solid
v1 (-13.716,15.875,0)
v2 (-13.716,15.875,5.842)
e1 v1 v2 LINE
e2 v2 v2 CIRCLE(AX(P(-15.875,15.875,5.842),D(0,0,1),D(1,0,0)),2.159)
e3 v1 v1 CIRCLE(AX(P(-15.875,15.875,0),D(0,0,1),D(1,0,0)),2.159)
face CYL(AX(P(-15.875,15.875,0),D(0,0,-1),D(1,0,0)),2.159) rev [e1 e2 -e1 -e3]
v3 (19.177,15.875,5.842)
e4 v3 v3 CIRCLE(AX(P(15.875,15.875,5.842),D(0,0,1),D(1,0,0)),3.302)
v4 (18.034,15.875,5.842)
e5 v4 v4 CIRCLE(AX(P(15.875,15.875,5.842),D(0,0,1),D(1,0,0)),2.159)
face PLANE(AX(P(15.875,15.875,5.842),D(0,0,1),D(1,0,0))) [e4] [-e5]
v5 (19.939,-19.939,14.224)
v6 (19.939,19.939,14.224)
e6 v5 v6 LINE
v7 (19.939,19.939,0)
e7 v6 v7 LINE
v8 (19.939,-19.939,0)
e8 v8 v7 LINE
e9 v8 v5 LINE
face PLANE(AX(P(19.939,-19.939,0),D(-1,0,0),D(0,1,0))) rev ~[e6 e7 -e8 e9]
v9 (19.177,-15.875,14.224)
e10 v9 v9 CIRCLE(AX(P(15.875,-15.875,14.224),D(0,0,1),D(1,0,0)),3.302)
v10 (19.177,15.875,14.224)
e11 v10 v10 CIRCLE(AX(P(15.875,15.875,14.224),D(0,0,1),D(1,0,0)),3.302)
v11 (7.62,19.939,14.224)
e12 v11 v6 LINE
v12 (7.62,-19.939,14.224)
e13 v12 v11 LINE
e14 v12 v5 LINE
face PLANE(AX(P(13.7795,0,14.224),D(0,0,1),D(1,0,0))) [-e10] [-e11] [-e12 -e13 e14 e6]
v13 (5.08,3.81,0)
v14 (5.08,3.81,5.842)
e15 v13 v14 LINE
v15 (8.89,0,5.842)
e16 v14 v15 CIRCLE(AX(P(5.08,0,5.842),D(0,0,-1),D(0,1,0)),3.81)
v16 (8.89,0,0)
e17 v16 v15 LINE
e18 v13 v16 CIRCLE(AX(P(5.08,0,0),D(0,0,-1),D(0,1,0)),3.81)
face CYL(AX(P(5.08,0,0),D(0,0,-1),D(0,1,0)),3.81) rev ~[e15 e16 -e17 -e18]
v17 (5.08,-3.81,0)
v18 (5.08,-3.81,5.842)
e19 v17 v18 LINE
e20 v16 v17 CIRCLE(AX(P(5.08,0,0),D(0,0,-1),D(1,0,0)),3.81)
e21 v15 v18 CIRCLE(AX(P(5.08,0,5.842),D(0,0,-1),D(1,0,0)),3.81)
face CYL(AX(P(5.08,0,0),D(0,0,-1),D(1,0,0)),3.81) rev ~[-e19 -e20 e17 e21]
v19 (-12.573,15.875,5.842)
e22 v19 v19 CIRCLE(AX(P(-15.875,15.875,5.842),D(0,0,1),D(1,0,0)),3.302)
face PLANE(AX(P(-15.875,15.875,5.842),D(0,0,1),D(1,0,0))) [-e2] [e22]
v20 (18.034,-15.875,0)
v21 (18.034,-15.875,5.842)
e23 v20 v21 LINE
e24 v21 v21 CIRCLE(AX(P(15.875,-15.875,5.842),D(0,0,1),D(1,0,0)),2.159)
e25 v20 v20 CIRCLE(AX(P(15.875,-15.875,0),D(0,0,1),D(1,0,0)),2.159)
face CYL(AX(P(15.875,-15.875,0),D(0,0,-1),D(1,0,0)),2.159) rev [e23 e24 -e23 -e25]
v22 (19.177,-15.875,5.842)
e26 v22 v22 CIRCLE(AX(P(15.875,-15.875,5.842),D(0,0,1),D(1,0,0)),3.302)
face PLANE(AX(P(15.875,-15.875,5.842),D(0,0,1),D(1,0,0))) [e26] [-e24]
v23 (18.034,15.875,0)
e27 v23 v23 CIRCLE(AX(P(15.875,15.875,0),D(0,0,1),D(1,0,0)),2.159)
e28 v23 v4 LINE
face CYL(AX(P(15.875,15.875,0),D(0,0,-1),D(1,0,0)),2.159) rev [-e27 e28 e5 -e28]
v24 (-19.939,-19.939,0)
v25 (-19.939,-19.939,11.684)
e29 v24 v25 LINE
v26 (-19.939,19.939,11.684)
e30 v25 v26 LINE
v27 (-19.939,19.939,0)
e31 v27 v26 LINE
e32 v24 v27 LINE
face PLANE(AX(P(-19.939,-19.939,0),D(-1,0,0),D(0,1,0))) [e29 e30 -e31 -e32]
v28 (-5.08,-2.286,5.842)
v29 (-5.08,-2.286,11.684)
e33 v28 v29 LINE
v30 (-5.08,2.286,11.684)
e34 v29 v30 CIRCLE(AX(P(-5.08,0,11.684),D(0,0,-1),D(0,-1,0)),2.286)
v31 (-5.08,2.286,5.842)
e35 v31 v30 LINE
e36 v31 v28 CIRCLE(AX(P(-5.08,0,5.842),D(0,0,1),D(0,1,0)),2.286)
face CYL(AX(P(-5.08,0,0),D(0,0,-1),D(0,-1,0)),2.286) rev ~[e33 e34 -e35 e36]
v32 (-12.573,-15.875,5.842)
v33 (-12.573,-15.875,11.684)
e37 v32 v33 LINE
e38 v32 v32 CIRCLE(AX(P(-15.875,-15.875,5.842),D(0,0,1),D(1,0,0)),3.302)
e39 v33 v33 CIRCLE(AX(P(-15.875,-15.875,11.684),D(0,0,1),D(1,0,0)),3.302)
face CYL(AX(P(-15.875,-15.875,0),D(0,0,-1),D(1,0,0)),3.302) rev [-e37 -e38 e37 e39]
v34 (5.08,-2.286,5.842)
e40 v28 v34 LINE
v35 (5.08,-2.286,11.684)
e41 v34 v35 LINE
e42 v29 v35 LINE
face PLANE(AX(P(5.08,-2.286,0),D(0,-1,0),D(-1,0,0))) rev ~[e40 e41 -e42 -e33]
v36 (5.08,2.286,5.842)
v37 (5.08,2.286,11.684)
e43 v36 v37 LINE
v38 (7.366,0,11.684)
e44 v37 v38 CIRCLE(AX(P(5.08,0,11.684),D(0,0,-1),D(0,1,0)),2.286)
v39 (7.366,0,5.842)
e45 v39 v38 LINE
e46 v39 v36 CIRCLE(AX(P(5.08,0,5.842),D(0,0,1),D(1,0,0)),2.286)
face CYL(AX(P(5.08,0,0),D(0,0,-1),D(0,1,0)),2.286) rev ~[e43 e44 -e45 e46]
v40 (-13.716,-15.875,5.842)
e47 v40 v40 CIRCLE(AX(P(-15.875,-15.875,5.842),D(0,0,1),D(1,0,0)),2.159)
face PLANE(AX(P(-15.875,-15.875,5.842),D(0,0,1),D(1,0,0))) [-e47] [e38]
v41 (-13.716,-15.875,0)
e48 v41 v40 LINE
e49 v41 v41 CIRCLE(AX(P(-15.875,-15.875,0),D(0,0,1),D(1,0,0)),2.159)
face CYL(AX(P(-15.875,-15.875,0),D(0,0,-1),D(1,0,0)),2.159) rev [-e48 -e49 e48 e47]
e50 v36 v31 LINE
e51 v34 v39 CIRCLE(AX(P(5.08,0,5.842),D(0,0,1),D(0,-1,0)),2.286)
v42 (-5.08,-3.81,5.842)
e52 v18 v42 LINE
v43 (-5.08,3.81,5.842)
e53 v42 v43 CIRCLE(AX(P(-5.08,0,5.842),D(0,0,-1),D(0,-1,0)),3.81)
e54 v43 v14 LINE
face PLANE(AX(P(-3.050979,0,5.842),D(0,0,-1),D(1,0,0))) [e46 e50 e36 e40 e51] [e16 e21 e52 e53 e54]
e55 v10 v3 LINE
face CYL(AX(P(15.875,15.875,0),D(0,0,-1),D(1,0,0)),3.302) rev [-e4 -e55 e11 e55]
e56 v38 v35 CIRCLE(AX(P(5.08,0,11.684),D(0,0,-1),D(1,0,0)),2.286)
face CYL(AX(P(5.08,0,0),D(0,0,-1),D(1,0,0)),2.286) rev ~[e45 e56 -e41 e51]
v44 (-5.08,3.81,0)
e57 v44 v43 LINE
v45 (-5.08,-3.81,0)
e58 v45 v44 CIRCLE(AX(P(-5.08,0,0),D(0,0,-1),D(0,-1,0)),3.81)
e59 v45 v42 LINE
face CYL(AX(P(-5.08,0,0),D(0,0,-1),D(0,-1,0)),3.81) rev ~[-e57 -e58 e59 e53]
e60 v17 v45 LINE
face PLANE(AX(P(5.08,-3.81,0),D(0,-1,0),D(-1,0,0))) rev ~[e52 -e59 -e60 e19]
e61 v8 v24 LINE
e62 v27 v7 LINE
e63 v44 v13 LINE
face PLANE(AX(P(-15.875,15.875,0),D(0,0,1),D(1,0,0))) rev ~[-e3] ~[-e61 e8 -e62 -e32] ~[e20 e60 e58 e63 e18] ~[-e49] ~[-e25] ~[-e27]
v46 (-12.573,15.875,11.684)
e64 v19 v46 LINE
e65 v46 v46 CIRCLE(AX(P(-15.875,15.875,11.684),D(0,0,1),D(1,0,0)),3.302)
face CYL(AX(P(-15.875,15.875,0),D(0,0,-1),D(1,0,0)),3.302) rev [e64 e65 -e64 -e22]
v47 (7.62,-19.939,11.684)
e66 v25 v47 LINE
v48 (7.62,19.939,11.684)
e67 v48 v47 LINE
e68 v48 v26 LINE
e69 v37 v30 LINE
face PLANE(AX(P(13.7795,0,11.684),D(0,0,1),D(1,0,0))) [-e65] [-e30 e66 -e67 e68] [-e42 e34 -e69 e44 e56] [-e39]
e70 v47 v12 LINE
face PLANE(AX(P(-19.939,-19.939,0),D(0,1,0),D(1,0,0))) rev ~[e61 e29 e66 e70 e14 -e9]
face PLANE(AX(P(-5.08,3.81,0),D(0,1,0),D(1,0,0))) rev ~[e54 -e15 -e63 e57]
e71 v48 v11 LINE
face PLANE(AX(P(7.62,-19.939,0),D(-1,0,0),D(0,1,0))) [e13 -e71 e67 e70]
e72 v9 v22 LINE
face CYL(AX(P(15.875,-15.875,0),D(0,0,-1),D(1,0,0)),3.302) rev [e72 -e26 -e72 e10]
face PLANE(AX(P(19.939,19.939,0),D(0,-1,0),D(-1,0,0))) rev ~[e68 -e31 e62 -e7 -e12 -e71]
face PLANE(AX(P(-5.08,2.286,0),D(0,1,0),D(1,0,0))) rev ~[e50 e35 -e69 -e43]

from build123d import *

# Parameters (mm, degrees)
F0_W     = 12.319
F0_H     = 39.878
F0_R     = 3.302
F0_W_2   = 27.559
F1_DEPTH = 11.684
F0_R_2   = 2.159
F2_DEPTH = 5.842
F3_DEPTH = 14.224
F5_DEPTH = 25.4
F6_DEPTH = 5.842


# Not quite as in the source:
# - a feature names something its author has since deleted; it is built from what else it names


with BuildPart() as f1:
    # F0 (on Top) → F1 (new body)
    with BuildSketch(Plane.XY):
        with Locations((13.7795, 0)):
            Rectangle(F0_W, F0_H)
        with Locations((15.875, -15.875)):
            Circle(F0_R, mode=Mode.SUBTRACT)
        with Locations((15.875, 15.875)):
            Circle(F0_R, mode=Mode.SUBTRACT)
        with Locations((-6.1595, 0)):
            Rectangle(F0_W_2, F0_H)
        with Locations((-15.875, -15.875)):
            Circle(F0_R, mode=Mode.SUBTRACT)
        with Locations((-15.875, 15.875)):
            Circle(F0_R, mode=Mode.SUBTRACT)
    extrude(amount=F1_DEPTH)

    # F0 (on Top) → F2 (join)
    with BuildSketch(Plane.XY):
        with Locations((-15.875, 15.875)):
            Circle(F0_R)
        with Locations((-15.875, 15.875)):
            Circle(F0_R_2, mode=Mode.SUBTRACT)
        with Locations((15.875, 15.875)):
            Circle(F0_R)
        with Locations((15.875, 15.875)):
            Circle(F0_R_2, mode=Mode.SUBTRACT)
        with Locations((15.875, -15.875)):
            Circle(F0_R)
        with Locations((15.875, -15.875)):
            Circle(F0_R_2, mode=Mode.SUBTRACT)
        with Locations((-15.875, -15.875)):
            Circle(F0_R)
        with Locations((-15.875, -15.875)):
            Circle(F0_R_2, mode=Mode.SUBTRACT)
    extrude(amount=F2_DEPTH)

    # F0 (on Top) → F3 (join)
    with BuildSketch(Plane.XY):
        with Locations((13.7795, 0)):
            Rectangle(F0_W, F0_H)
        with Locations((15.875, -15.875)):
            Circle(F0_R, mode=Mode.SUBTRACT)
        with Locations((15.875, 15.875)):
            Circle(F0_R, mode=Mode.SUBTRACT)
    extrude(amount=F3_DEPTH)

    # F4 (on face) → F5 (cut)
    with BuildSketch(Plane(origin=(0, 0, 0), x_dir=(1, 0, 0), z_dir=(0, 0, -1))):
        with BuildLine():
            ThreePointArc((-2.794, 0), (-3.4635538982, 1.6164461018), (-5.08, 2.286))
            ThreePointArc((-5.08, 2.286), (-7.366, 0), (-5.08, -2.286))
            ThreePointArc((-5.08, -2.286), (-3.4635538982, -1.6164461018), (-2.794, 0))
        make_face()
        with BuildLine():
            ThreePointArc((7.366, 0), (6.6964461018, 1.6164461018), (5.08, 2.286))
            ThreePointArc((5.08, 2.286), (2.794, 0), (5.08, -2.286))
            ThreePointArc((5.08, -2.286), (6.6964461018, -1.6164461018), (7.366, 0))
        make_face()
        with BuildLine():
            ThreePointArc((-1.27, 0), (-1.4655166344, 1.2048277885), (-2.032, 2.286))
            Line((-2.032, 2.286), (-5.08, 2.286))
            ThreePointArc((-5.08, 2.286), (-3.4635538982, 1.6164461018), (-2.794, 0))
            ThreePointArc((-2.794, 0), (-3.4635538982, -1.6164461018), (-5.08, -2.286))
            Line((-5.08, -2.286), (-2.032, -2.286))
            ThreePointArc((-2.032, -2.286), (-1.4655166344, -1.2048277885), (-1.27, 0))
        make_face()
        with BuildLine():
            ThreePointArc((2.032, -2.286), (1.27, 0), (2.032, 2.286))
            Line((2.032, 2.286), (-2.032, 2.286))
            ThreePointArc((-2.032, 2.286), (-1.4655166344, 1.2048277885), (-1.27, 0))
            ThreePointArc((-1.27, 0), (-1.4655166344, -1.2048277885), (-2.032, -2.286))
            Line((-2.032, -2.286), (2.032, -2.286))
        make_face()
        with BuildLine():
            Line((5.08, 2.286), (2.032, 2.286))
            ThreePointArc((2.032, 2.286), (1.27, 0), (2.032, -2.286))
            Line((2.032, -2.286), (5.08, -2.286))
            ThreePointArc((5.08, -2.286), (2.794, 0), (5.08, 2.286))
        make_face()
    extrude(amount=-F5_DEPTH, mode=Mode.SUBTRACT)

    # F4 (on face) → F6 (cut)
    with BuildSketch(Plane(origin=(0, 0, 0), x_dir=(1, 0, 0), z_dir=(0, 0, -1))):
        with BuildLine():
            ThreePointArc((-1.27, 0), (-1.4655166344, 1.2048277885), (-2.032, 2.286))
            Line((-2.032, 2.286), (-5.08, 2.286))
            ThreePointArc((-5.08, 2.286), (-3.4635538982, 1.6164461018), (-2.794, 0))
            ThreePointArc((-2.794, 0), (-3.4635538982, -1.6164461018), (-5.08, -2.286))
            Line((-5.08, -2.286), (-2.032, -2.286))
            ThreePointArc((-2.032, -2.286), (-1.4655166344, -1.2048277885), (-1.27, 0))
        make_face()
        with BuildLine():
            ThreePointArc((-2.032, 2.286), (-3.3761162011, 3.4077675977), (-5.08, 3.81))
            ThreePointArc((-5.08, 3.81), (-8.89, 0), (-5.08, -3.81))
            ThreePointArc((-5.08, -3.81), (-3.3761162011, -3.4077675977), (-2.032, -2.286))
            Line((-2.032, -2.286), (-5.08, -2.286))
            ThreePointArc((-5.08, -2.286), (-7.366, 0), (-5.08, 2.286))
            Line((-5.08, 2.286), (-2.032, 2.286))
        make_face()
        with BuildLine():
            ThreePointArc((2.032, 2.286), (3.3761162011, 3.4077675977), (5.08, 3.81))
            Line((5.08, 3.81), (-5.08, 3.81))
            ThreePointArc((-5.08, 3.81), (-3.3761162011, 3.4077675977), (-2.032, 2.286))
            Line((-2.032, 2.286), (2.032, 2.286))
        make_face()
        with BuildLine():
            ThreePointArc((2.032, -2.286), (1.27, 0), (2.032, 2.286))
            Line((2.032, 2.286), (-2.032, 2.286))
            ThreePointArc((-2.032, 2.286), (-1.4655166344, 1.2048277885), (-1.27, 0))
            ThreePointArc((-1.27, 0), (-1.4655166344, -1.2048277885), (-2.032, -2.286))
            Line((-2.032, -2.286), (2.032, -2.286))
        make_face()
        with BuildLine():
            Line((5.08, 2.286), (2.032, 2.286))
            ThreePointArc((2.032, 2.286), (1.27, 0), (2.032, -2.286))
            Line((2.032, -2.286), (5.08, -2.286))
            ThreePointArc((5.08, -2.286), (2.794, 0), (5.08, 2.286))
        make_face()
        with BuildLine():
            ThreePointArc((5.08, -3.81), (7.7740768363, -2.6940768363), (8.89, 0))
            ThreePointArc((8.89, 0), (7.7740768363, 2.6940768363), (5.08, 3.81))
            ThreePointArc((5.08, 3.81), (3.3761162011, 3.4077675977), (2.032, 2.286))
            Line((2.032, 2.286), (5.08, 2.286))
            ThreePointArc((5.08, 2.286), (6.6964461018, 1.6164461018), (7.366, 0))
            ThreePointArc((7.366, 0), (6.6964461018, -1.6164461018), (5.08, -2.286))
            Line((5.08, -2.286), (2.032, -2.286))
            ThreePointArc((2.032, -2.286), (3.3761162011, -3.4077675977), (5.08, -3.81))
        make_face()
        with BuildLine():
            Line((-5.08, -3.81), (5.08, -3.81))
            ThreePointArc((5.08, -3.81), (3.3761162011, -3.4077675977), (2.032, -2.286))
            Line((2.032, -2.286), (-2.032, -2.286))
            ThreePointArc((-2.032, -2.286), (-3.3761162011, -3.4077675977), (-5.08, -3.81))
        make_face()
    extrude(amount=-F6_DEPTH, mode=Mode.SUBTRACT)


solid = f1.part
